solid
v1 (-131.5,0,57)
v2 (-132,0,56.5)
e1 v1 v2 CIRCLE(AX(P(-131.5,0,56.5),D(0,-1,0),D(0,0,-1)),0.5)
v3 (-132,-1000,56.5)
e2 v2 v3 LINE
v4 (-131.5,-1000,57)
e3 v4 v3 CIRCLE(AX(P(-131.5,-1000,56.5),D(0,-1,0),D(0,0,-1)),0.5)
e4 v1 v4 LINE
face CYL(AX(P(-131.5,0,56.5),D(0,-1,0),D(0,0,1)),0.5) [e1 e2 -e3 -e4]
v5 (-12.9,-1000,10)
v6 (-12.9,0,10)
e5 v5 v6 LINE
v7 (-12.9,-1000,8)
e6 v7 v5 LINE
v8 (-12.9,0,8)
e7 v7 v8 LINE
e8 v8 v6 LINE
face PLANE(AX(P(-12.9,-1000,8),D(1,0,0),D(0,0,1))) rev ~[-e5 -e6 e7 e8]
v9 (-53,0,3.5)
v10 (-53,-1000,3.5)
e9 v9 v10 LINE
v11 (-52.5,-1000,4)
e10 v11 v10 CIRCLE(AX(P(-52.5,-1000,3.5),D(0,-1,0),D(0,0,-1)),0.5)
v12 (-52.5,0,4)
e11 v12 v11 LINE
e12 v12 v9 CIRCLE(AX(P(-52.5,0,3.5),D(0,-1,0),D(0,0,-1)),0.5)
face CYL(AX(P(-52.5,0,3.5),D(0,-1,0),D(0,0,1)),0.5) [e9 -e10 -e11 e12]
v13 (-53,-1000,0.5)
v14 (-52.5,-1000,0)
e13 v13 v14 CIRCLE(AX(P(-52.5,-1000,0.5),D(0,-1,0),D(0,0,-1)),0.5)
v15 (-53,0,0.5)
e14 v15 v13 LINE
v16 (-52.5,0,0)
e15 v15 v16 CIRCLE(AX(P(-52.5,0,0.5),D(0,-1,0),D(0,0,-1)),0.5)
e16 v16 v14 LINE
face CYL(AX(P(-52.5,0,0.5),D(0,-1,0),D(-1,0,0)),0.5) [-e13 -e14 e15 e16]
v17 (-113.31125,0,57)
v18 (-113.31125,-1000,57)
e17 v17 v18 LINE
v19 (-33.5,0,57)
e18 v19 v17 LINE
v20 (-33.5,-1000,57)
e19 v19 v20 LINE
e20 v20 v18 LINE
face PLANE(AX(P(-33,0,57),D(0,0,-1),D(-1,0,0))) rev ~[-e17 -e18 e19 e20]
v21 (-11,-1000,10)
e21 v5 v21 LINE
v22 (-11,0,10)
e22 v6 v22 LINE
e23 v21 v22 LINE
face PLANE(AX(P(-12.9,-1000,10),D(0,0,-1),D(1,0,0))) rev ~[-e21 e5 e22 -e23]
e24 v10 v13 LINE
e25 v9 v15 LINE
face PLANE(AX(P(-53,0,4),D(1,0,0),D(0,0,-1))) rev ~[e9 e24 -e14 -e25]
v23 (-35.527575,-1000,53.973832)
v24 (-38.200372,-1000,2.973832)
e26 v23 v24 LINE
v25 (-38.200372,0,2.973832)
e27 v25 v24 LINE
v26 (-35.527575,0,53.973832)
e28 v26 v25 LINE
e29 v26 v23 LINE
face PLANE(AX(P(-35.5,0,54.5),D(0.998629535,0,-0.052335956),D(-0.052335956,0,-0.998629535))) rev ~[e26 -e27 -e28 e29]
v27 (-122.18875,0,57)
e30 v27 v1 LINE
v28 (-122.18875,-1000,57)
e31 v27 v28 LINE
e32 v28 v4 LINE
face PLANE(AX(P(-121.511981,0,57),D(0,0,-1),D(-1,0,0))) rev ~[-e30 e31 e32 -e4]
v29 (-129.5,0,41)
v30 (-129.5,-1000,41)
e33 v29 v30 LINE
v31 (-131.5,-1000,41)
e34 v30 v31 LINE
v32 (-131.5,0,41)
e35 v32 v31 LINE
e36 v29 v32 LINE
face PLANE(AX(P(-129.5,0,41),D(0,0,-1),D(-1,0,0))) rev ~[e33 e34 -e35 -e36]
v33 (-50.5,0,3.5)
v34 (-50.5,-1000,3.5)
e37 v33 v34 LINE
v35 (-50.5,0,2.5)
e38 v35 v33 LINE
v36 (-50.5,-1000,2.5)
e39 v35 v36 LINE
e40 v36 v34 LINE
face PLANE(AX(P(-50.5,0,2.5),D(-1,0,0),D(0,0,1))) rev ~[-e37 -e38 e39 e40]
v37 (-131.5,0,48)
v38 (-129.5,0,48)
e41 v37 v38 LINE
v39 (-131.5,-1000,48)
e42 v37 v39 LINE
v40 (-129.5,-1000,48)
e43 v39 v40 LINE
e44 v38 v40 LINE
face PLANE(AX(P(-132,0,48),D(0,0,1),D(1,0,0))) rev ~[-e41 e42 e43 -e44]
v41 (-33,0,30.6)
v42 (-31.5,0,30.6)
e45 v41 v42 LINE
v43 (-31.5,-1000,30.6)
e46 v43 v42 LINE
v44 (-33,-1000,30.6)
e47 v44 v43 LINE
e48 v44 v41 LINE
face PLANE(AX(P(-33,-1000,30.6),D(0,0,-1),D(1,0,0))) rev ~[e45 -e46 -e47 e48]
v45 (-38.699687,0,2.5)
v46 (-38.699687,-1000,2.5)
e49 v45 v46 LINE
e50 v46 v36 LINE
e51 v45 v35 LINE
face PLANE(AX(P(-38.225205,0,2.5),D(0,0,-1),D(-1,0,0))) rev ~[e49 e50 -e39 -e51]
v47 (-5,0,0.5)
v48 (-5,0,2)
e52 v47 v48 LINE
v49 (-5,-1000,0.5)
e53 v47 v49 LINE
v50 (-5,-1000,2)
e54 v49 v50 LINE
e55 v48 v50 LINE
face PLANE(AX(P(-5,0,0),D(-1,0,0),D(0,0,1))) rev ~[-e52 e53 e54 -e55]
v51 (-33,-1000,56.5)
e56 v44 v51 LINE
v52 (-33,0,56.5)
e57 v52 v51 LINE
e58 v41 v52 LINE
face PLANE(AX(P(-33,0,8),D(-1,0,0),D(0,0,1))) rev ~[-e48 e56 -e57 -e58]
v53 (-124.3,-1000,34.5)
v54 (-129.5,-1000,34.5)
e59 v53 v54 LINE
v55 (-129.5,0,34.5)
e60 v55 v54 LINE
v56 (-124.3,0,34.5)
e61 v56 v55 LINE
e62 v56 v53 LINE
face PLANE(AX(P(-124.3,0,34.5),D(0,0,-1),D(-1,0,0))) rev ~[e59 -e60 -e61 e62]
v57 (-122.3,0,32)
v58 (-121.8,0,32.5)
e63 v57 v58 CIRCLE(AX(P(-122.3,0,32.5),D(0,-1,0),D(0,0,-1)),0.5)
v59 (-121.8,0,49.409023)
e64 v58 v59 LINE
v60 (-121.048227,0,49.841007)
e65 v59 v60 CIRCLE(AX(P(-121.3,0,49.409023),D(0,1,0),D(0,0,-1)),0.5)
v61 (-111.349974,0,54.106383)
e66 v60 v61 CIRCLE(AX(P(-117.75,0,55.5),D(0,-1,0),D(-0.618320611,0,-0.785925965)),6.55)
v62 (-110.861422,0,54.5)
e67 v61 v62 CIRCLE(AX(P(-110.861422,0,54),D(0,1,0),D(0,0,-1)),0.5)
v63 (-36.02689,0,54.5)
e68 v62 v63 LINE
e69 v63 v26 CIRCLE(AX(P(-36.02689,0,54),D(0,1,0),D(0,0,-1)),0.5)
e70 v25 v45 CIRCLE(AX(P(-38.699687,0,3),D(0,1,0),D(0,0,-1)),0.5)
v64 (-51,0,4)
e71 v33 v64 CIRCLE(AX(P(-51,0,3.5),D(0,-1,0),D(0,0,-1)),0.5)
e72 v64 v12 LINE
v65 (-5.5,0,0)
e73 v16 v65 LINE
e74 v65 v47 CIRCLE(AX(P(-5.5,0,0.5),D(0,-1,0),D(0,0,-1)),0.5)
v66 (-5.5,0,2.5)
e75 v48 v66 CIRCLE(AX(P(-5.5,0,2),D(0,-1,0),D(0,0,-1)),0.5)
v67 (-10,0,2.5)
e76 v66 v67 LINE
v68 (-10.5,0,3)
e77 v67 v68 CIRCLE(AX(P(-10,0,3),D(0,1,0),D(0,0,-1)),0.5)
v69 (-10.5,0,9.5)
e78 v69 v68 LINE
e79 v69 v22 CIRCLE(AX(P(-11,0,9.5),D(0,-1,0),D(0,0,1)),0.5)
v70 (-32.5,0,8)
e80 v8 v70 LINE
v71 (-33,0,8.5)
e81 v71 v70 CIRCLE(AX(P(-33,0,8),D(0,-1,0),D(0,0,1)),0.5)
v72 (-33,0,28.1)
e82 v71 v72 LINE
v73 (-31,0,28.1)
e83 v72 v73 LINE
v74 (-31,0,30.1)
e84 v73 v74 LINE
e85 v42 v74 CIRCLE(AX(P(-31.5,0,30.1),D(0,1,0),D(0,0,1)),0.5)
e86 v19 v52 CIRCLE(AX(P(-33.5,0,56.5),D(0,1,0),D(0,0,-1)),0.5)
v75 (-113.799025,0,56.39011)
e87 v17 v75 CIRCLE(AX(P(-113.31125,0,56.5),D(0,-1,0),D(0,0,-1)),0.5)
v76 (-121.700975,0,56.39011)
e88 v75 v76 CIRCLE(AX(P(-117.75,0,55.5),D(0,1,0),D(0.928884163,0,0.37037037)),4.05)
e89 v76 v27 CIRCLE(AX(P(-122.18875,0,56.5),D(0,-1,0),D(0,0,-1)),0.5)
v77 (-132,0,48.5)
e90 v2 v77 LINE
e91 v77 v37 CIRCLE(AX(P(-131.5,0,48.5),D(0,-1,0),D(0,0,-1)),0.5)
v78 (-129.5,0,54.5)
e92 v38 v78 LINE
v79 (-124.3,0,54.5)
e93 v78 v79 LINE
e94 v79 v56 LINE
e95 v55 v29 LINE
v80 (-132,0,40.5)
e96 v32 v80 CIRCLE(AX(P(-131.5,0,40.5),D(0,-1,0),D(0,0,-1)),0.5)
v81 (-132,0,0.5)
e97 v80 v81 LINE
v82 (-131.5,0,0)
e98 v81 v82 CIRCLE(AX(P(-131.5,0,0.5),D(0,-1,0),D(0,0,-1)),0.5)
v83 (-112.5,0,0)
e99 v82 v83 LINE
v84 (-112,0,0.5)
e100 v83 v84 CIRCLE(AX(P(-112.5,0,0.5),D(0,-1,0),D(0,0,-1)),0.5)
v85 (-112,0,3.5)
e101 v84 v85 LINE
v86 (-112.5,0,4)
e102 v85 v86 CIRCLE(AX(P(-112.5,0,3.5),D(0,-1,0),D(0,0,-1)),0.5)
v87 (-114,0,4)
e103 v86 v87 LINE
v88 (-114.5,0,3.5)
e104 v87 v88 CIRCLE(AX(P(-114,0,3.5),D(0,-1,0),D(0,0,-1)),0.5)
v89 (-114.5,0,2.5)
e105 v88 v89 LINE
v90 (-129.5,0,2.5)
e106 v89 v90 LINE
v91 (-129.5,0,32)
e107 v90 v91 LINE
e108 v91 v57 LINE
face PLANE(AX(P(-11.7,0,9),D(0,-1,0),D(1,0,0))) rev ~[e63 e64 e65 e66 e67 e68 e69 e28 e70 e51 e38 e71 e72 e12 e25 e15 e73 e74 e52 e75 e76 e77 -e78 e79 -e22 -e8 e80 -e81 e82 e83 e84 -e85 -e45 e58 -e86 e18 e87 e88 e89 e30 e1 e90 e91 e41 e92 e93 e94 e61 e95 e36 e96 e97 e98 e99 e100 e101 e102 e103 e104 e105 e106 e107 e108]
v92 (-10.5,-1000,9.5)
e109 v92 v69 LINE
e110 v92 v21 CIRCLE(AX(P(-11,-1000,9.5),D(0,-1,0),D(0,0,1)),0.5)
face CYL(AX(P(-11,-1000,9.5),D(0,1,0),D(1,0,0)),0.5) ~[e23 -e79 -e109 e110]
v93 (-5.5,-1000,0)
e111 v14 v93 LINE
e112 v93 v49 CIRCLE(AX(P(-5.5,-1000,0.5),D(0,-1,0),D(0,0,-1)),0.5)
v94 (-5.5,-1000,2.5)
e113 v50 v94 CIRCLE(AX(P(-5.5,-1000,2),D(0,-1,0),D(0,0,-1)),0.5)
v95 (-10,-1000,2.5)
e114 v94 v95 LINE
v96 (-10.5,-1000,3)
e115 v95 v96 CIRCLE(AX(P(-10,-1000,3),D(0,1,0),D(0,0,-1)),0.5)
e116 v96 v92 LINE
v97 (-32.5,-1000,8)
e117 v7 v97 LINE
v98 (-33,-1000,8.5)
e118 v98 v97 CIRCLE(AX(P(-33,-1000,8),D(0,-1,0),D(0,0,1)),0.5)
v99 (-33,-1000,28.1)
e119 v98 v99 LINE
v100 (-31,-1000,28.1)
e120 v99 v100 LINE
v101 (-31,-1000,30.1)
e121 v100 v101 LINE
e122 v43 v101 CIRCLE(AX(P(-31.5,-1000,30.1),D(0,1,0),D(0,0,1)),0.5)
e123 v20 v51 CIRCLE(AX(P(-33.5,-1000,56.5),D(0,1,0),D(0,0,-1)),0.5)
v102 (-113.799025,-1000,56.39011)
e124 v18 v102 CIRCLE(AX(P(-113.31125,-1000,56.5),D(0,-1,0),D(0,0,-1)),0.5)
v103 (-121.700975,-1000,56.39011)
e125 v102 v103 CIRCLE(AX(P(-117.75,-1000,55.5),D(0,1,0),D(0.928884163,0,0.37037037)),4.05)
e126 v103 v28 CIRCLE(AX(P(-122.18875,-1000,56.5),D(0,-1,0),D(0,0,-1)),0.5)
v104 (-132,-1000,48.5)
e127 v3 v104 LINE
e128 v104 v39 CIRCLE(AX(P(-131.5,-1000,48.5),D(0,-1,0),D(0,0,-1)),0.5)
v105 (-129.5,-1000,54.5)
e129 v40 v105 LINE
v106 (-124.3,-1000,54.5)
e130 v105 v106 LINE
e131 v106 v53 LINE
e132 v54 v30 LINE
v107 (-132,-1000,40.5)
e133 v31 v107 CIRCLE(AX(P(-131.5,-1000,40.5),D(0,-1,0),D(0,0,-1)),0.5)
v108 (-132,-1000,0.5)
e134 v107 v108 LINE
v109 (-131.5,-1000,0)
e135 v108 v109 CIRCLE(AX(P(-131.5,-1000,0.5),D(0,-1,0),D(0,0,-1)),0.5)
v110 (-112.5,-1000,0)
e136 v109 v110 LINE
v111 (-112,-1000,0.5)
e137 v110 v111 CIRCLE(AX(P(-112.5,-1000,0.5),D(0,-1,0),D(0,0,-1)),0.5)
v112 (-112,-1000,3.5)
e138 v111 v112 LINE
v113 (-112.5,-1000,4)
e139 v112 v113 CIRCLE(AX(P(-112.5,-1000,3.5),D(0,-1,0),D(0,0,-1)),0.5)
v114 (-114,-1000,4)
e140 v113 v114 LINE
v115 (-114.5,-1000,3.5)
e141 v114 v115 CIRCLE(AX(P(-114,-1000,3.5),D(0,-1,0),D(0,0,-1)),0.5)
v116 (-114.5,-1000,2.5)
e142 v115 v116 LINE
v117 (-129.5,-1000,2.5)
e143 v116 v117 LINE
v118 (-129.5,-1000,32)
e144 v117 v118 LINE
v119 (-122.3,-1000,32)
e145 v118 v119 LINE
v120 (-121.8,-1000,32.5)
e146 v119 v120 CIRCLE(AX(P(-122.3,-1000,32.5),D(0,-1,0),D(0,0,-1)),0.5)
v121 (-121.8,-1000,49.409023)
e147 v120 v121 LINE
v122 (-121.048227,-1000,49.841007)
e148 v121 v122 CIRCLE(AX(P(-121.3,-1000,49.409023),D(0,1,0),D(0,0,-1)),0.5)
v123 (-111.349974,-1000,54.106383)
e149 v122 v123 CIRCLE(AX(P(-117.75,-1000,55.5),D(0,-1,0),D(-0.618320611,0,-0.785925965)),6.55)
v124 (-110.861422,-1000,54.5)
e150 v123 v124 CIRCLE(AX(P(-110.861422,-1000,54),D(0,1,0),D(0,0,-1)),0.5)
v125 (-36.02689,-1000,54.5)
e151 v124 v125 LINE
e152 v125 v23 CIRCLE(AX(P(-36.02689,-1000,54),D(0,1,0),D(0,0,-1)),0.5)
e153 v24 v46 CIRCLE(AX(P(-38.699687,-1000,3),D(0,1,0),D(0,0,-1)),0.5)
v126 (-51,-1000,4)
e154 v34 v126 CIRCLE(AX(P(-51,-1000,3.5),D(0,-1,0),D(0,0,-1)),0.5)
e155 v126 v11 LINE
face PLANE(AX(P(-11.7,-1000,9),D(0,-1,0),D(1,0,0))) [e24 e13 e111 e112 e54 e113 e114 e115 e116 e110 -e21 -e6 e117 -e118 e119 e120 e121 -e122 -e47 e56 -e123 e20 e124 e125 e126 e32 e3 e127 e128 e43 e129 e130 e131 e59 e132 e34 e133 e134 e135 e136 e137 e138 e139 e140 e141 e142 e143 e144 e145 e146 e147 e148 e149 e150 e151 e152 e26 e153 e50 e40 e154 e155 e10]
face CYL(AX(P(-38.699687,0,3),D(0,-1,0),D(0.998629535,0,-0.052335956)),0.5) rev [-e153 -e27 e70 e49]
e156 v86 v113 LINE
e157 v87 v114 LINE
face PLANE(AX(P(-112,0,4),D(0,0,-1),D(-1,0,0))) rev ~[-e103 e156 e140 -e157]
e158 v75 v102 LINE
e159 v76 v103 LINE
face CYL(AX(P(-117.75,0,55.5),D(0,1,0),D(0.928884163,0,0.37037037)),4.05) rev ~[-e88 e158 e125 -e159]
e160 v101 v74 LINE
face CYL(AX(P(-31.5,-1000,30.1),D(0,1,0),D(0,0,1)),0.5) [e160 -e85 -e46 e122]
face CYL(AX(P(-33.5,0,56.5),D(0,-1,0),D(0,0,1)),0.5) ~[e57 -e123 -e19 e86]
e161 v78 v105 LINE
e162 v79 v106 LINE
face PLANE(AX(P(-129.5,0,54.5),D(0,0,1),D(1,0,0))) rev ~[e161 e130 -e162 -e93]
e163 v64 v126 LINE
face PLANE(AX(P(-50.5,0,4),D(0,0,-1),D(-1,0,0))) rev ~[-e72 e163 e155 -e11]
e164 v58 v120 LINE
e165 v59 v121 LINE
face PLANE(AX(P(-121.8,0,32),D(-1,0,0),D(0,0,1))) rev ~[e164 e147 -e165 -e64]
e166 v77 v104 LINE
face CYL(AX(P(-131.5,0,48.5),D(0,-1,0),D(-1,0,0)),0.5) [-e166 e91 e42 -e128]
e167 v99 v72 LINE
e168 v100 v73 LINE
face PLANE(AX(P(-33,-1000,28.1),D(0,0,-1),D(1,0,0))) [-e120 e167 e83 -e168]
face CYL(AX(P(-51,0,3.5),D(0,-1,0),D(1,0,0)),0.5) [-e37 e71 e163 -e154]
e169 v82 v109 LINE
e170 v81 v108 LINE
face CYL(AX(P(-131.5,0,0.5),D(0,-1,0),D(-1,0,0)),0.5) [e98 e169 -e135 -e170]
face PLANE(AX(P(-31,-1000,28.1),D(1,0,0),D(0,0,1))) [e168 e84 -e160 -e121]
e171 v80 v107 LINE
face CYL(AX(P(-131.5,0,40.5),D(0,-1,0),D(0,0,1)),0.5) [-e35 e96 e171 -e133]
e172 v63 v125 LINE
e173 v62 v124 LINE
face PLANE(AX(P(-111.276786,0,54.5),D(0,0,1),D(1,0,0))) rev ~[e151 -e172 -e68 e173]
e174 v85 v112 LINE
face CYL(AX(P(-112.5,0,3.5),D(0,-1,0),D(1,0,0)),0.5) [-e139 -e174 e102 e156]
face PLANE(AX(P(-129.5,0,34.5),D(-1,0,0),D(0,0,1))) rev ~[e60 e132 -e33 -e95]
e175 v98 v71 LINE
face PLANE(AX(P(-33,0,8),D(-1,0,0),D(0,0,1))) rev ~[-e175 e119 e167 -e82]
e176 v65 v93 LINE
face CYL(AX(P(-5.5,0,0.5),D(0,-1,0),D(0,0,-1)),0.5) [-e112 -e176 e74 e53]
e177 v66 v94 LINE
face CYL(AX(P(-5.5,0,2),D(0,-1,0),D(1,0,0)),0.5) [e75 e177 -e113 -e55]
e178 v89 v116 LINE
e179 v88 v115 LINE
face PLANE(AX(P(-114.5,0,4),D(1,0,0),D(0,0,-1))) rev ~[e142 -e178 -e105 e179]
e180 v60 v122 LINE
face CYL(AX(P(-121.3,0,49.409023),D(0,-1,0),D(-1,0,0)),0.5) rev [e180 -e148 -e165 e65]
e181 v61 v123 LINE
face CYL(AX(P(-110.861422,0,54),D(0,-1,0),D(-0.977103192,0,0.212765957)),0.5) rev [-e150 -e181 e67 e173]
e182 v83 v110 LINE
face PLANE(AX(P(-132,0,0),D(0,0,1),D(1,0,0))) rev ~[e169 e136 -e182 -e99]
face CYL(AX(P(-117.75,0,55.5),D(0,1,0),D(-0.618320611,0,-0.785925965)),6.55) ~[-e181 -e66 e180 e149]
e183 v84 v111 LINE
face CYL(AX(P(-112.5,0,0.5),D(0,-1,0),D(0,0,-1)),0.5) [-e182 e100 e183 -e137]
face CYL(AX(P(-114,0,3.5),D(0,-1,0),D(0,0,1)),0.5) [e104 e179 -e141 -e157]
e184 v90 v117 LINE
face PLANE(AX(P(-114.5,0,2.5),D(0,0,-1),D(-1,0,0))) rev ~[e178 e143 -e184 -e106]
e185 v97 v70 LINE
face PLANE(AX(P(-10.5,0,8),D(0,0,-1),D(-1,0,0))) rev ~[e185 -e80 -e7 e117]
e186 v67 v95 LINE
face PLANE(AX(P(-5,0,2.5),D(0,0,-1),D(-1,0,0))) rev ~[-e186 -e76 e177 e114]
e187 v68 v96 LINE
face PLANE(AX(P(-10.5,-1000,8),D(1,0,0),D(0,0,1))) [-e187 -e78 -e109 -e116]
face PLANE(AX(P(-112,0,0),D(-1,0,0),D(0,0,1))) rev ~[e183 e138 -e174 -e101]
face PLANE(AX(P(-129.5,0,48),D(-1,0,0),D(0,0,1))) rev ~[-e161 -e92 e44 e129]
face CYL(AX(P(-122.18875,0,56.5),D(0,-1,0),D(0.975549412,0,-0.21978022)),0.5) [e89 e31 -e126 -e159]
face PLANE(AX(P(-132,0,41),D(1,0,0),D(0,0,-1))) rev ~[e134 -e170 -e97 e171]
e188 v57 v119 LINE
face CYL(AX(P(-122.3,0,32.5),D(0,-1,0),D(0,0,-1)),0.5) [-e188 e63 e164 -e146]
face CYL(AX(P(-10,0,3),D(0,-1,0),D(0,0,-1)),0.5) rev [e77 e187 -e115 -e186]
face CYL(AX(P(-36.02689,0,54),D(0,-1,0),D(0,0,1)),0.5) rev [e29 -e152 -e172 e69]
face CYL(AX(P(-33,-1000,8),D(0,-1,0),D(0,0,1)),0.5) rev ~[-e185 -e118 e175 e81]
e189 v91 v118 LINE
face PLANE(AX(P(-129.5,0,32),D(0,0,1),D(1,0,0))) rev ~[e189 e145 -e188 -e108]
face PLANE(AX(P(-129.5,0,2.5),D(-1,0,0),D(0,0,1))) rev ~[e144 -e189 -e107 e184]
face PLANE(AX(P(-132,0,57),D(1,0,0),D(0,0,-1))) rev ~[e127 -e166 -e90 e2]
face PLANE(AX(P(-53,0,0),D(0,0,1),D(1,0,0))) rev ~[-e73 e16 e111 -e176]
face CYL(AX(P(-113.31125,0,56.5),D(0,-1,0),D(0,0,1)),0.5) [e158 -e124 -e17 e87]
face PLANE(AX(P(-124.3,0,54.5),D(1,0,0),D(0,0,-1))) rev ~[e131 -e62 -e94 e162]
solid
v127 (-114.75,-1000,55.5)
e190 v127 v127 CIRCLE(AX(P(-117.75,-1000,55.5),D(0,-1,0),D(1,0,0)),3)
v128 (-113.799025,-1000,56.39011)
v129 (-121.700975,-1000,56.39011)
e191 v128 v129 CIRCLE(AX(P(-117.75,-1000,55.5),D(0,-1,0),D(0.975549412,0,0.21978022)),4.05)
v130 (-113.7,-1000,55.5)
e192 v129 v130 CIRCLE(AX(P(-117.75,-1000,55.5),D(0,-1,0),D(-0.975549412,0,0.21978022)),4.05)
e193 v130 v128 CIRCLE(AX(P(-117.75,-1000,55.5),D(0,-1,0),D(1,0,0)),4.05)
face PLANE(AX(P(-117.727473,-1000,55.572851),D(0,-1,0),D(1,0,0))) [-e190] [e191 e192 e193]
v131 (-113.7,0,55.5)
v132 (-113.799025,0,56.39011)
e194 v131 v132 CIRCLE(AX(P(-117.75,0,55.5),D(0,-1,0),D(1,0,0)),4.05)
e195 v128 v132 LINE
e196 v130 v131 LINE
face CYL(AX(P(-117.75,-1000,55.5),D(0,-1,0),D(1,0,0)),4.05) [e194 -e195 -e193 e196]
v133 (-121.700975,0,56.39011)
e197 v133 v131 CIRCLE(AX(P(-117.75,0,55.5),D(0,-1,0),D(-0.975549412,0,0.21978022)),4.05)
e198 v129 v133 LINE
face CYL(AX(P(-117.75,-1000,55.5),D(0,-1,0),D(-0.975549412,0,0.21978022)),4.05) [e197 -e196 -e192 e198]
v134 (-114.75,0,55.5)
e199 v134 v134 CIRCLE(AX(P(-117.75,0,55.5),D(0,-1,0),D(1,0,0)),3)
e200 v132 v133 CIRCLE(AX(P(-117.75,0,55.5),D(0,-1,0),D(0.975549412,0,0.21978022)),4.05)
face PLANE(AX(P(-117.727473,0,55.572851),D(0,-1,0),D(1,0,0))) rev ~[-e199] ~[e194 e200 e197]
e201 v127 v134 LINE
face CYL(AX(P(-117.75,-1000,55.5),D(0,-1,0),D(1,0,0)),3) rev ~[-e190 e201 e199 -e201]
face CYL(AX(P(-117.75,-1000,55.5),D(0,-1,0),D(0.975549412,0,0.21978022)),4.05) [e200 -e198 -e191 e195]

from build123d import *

# Parameters (mm, degrees)
F1_DEPTH = 1000
F2_R     = 0.5
F4_DEPTH = 1000
F5_W     = 2
F5_H     = 2.5
F5_W_2   = 2.4
F5_H_2   = 2
F6_DEPTH = 1000
F7_R     = 0.5
F8_R     = 3
F9_DEPTH = 1000


# Not quite as in the source:
# - a feature names something its author has since deleted; it is built from what else it names


with BuildPart() as f1:
    # F0 (on Front) → F1 (new body)
    with BuildSketch(Plane.XZ):
        with BuildLine():
            Line((-33, 57), (-113.9880191388, 57))
            ThreePointArc((-113.9880191388, 57), (-117.75, 51.45), (-121.5119808612, 57))
            Line((-121.5119808612, 57), (-132, 57))
            Line((-132, 57), (-132, 48))
            Line((-132, 48), (-129.5, 48))
            Line((-129.5, 48), (-129.5, 54.5))
            Line((-129.5, 54.5), (-124.3, 54.5))
            Line((-124.3, 54.5), (-124.3, 34.5))
            Line((-124.3, 34.5), (-129.5, 34.5))
            Line((-129.5, 34.5), (-129.5, 41))
            Line((-129.5, 41), (-132, 41))
            Line((-132, 41), (-132, 0))
            Line((-132, 0), (-112, 0))
            Line((-112, 0), (-112, 4))
            Line((-112, 4), (-114.5, 4))
            Line((-114.5, 4), (-114.5, 2.5))
            Line((-114.5, 2.5), (-129.5, 2.5))
            Line((-129.5, 2.5), (-129.5, 32))
            Line((-129.5, 32), (-121.8, 32))
            Line((-121.8, 32), (-121.8, 50.3521849295))
            ThreePointArc((-121.8, 50.3521849295), (-115.3481082383, 49.4062806132), (-111.2767859606, 54.5))
            Line((-111.2767859606, 54.5), (-35.5, 54.5))
            Line((-35.5, 54.5), (-38.2252045227, 2.5))
            Line((-38.2252045227, 2.5), (-50.5, 2.5))
            Line((-50.5, 2.5), (-50.5, 4))
            Line((-50.5, 4), (-53, 4))
            Line((-53, 4), (-53, 0))
            Line((-53, 0), (-5, 0))
            Line((-5, 0), (-5, 2.5))
            Line((-5, 2.5), (-10.5, 2.5))
            Line((-10.5, 2.5), (-10.5, 8))
            Line((-10.5, 8), (-33, 8))
            Line((-33, 8), (-33, 57))
        make_face()
    extrude(amount=F1_DEPTH)

    # F2
    f2_edges = [f1.edges().sort_by_distance(p)[0] for p in [
        (-132, -500, 57),
        (-132, -500, 41),
        (-112, -500, 0),
        (-33, -500, 57),
        (-121.511981, -500, 57),
        (-113.988019, -500, 57),
        (-132, -500, 48),
        (-114.5, -500, 4),
        (-112, -500, 4),
        (-53, -500, 4),
        (-50.5, -500, 4),
        (-53, -500, 0),
        (-132, -500, 0),
        (-121.8, -500, 32),
        (-38.225205, -500, 2.5),
        (-35.5, -500, 54.5),
        (-111.276786, -500, 54.5),
        (-121.8, -500, 50.352185),
        (-5, -500, 0),
        (-5, -500, 2.5),
        (-10.5, -500, 2.5),
    ]]
    fillet(f2_edges, radius=F2_R)

    # F3 (on face) → F4 (cut)
    with BuildSketch(Plane.XZ.offset(1000)):
        with BuildLine():
            ThreePointArc((-33, 8.5), (-33.3535533906, 7.6464466094), (-32.5, 8))
            Line((-32.5, 8), (-33, 8))
            Line((-33, 8), (-33, 8.5))
        make_face()
    extrude(amount=-F4_DEPTH, mode=Mode.SUBTRACT)

    # F5 (on face) → F6 (join)
    with BuildSketch(Plane.XZ.offset(1000)):
        with Locations((-32, 29.35)):
            Rectangle(F5_W, F5_H)
        with Locations((-11.7, 9)):
            Rectangle(F5_W_2, F5_H_2)
    extrude(amount=-F6_DEPTH)

    # F7
    f7_edges = [f1.edges().sort_by_distance(p)[0] for p in [
        (-31, -500, 30.6),
        (-10.5, -500, 10),
    ]]
    fillet(f7_edges, radius=F7_R)


with BuildPart() as f9:
    # F8 (on face) → F9 (new body)
    with BuildSketch(Plane.XZ.offset(1000)):
        with BuildLine():
            ThreePointArc((-121.7009751181, 56.3901098901), (-118.1978006096, 51.4748323496), (-113.7, 55.5))
            ThreePointArc((-113.7, 55.5), (-113.7248323496, 55.9478006096), (-113.7990248819, 56.3901098901))
            ThreePointArc((-113.7990248819, 56.3901098901), (-117.75, 59.55), (-121.7009751181, 56.3901098901))
        make_face()
        with Locations((-117.75, 55.5)):
            Circle(F8_R, mode=Mode.SUBTRACT)
    extrude(amount=-F9_DEPTH)


solid = Compound([f1.part, f9.part])
